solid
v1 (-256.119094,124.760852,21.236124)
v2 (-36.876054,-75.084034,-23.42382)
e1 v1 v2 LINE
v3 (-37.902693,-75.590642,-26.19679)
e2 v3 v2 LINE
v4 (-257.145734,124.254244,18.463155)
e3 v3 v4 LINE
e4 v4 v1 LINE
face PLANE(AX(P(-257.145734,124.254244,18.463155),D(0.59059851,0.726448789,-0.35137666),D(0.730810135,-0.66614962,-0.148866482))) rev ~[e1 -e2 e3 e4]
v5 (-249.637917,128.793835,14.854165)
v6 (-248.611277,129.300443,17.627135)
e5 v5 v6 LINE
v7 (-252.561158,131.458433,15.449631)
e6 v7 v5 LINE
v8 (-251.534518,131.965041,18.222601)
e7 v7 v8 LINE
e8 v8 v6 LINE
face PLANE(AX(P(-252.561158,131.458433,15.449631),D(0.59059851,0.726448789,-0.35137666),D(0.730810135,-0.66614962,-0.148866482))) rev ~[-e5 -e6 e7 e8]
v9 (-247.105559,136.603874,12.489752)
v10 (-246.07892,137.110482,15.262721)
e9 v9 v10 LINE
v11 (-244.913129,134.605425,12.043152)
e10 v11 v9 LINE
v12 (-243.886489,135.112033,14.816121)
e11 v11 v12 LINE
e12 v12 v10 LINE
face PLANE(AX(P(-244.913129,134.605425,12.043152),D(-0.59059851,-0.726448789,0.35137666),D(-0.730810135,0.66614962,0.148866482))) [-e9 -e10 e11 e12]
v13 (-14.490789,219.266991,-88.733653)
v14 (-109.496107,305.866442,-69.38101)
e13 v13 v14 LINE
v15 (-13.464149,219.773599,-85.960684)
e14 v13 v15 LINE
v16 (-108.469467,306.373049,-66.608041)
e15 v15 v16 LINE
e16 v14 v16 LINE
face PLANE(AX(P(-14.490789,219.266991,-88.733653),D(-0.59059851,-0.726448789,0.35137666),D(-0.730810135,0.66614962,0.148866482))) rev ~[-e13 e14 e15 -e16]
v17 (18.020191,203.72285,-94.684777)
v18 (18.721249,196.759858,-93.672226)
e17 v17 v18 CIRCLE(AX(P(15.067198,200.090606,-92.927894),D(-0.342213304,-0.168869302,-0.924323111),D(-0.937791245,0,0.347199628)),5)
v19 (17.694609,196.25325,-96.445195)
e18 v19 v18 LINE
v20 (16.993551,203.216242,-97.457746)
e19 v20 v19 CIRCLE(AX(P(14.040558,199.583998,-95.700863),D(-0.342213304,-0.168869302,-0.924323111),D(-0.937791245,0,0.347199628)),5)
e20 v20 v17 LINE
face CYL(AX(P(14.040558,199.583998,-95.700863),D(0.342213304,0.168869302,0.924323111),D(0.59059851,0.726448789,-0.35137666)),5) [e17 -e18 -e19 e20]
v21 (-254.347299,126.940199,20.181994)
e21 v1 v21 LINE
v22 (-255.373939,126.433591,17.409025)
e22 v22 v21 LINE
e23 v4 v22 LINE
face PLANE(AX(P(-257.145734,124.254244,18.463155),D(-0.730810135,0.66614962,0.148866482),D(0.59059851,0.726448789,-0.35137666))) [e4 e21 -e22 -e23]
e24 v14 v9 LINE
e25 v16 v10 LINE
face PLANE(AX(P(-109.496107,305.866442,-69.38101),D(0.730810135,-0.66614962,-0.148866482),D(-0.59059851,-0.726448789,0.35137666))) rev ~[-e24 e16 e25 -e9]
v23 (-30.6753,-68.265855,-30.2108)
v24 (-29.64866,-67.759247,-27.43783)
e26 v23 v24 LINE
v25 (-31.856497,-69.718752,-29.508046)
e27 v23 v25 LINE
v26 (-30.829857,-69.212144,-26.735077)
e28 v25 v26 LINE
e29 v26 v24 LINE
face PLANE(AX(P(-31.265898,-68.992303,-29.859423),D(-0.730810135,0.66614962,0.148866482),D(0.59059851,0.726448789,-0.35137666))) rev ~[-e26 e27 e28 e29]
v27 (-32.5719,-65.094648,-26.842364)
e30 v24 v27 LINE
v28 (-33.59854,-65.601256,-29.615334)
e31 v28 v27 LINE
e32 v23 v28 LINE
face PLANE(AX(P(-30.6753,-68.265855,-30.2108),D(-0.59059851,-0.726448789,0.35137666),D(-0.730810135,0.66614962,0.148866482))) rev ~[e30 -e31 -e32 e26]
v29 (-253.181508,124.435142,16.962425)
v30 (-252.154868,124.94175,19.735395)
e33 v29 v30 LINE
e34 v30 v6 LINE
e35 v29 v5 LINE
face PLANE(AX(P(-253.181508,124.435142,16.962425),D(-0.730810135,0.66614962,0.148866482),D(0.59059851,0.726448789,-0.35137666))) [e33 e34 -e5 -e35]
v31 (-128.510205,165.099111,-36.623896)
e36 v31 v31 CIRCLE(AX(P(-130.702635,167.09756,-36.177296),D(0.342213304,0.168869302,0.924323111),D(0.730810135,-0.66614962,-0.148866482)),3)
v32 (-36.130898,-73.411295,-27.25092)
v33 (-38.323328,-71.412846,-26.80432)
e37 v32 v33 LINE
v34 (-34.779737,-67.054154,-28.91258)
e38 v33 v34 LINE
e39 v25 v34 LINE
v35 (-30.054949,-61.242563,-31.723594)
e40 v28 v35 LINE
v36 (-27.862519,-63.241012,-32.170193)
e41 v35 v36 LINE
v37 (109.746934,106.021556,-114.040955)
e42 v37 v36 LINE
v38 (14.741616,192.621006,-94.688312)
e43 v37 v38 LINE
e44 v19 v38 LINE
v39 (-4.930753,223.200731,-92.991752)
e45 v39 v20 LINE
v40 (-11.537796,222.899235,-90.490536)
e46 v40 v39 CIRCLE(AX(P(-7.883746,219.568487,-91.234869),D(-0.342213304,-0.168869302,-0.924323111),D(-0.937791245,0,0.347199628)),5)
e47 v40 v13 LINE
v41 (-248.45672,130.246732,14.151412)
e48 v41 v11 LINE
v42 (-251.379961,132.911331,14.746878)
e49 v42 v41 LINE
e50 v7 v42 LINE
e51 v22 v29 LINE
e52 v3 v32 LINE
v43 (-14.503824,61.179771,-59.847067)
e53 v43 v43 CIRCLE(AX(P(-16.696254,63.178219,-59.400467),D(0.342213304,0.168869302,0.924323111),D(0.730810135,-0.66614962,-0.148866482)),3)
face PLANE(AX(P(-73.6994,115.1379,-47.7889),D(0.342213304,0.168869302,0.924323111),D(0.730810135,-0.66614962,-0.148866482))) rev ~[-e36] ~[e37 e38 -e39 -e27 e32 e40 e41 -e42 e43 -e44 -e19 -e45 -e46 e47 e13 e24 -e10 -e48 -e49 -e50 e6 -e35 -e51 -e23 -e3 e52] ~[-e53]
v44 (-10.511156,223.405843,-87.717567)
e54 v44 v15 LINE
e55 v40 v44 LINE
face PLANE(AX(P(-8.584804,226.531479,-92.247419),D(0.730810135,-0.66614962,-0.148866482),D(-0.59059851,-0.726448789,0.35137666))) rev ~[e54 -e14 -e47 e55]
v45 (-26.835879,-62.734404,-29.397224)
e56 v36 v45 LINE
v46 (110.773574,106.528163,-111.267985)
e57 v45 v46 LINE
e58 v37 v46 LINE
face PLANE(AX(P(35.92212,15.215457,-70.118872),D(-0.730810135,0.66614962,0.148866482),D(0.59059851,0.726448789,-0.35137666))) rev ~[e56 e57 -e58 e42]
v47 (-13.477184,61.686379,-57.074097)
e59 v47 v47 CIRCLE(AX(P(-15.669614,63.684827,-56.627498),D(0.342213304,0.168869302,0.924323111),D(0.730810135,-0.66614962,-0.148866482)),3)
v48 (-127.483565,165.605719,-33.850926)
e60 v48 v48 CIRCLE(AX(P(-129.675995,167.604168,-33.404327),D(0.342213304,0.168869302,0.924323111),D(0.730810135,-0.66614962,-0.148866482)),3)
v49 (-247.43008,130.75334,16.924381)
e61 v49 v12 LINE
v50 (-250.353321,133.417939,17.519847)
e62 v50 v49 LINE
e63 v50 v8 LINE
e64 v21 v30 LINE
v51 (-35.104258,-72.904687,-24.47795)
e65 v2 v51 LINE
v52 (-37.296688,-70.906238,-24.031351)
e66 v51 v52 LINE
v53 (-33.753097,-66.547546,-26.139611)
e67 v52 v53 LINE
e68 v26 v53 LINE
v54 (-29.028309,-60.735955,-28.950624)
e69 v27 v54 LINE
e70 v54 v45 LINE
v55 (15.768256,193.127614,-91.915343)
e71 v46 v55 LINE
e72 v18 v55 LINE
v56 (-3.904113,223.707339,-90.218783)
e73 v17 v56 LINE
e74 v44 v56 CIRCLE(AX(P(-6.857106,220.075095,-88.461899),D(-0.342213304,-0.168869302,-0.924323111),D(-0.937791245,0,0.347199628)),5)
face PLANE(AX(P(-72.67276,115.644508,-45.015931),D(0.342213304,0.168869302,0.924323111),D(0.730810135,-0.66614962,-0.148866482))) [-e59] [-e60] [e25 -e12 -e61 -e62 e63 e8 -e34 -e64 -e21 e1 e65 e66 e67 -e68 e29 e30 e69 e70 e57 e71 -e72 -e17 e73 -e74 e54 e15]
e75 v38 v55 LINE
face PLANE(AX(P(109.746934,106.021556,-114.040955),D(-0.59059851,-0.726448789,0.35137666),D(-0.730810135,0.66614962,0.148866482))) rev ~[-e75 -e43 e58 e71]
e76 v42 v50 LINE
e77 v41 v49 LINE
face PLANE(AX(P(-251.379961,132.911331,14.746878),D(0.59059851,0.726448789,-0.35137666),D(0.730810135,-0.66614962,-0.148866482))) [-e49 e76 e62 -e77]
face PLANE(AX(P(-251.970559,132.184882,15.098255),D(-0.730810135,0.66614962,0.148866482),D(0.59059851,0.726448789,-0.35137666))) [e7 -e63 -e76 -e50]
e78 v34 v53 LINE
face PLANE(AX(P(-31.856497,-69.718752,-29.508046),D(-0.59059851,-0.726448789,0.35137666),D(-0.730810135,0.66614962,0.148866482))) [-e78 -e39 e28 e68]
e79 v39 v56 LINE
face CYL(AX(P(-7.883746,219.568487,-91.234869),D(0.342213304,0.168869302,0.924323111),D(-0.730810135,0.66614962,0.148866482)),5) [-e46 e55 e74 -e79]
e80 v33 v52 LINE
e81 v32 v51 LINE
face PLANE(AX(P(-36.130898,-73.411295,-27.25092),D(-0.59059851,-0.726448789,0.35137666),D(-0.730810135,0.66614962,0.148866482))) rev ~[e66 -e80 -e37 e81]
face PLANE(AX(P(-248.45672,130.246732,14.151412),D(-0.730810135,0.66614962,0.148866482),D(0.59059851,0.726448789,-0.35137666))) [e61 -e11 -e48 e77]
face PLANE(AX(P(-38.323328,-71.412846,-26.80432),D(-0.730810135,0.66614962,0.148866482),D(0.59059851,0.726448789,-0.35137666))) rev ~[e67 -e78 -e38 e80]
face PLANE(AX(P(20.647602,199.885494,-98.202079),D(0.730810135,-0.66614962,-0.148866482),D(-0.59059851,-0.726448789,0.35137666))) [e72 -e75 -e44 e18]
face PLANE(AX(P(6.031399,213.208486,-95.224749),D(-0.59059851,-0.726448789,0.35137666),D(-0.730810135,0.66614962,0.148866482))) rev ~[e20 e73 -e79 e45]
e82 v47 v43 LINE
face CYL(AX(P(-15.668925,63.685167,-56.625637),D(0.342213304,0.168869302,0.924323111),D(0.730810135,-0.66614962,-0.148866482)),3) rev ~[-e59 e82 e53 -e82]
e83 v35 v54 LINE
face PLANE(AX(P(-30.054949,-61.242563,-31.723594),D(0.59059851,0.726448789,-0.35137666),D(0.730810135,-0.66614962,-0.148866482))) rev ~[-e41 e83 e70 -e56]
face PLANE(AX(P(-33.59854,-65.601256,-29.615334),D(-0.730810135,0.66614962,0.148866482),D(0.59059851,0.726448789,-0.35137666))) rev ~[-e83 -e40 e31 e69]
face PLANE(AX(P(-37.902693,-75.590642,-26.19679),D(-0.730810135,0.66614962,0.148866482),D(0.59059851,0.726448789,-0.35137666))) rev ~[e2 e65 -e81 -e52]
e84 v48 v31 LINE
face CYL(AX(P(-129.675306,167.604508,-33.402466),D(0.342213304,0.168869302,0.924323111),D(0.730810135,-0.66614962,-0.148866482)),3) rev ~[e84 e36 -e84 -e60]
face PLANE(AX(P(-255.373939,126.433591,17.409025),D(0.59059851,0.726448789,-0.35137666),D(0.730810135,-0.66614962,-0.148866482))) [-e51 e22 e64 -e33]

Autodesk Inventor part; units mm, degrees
ref_plane "YZ Plane" through (0, 0, 0) normal (1, 0, 0) x (0, 1, 0)
ref_plane "XZ Plane" through (0, 0, 0) normal (0, 1, 0) x (-1, 0, 0)
ref_plane "XY Plane" through (0, 0, 0) normal (0, 0, 1) x (1, 0, 0)
ref_plane "Plano de trabalho1" through (-73.6994, 115.1379, -47.7889) normal (0.3422133, 0.1688693, 0.9243231) x (0.7308101, -0.6661496, -0.1488665)
sketch "Esboço3" plane through (-73.6994, 115.1379, -47.7889) normal (0.3422133, 0.1688693, 0.9243231) x (0.7308101, -0.6661496, -0.1488665)
  line L0 (0, 0) -> (150, 0)
  line L1 (150, 0) -> (150, 125)
  line L2 (-150, -125) -> (150, -125)
  line L3 (150, -125) -> (147, -125)
  line L4 (150, -125) -> (150, -122)
  line L5 (150, -122) -> (147, -122)
  line L6 (147, -108) -> (150, -108)
  line L7 (150, -125) -> (150, -122)
  line L8 (150, -108) -> (150, 125)
  line L9 (-150, -125) -> (-150, -122)
  line L10 (-150, -122) -> (-147, -122)
  line L11 (-147, -108) -> (-150, -108)
  line L12 (-150, 125) -> (-150, -108)
  line L13 (-150, -122) -> (-150, -125)
  line L14 (0, 135) -> (20, 135)
  line L15 (0, 135) -> (-20, 135)
  line L16 (-20, 135) -> (-20, 125)
  line L17 (20, 135) -> (20, 125)
  line L18 (150, 125) -> (20, 125)
  line L19 (-20, 125) -> (-150, 125)
  line L20 (-151, -115) -> (-151, -114)
  line L21 (-151, -114) -> (-147, -114)
  line L22 (-151, -115) -> (-151, -116)
  line L23 (-151, -116) -> (-147, -116)
  line L24 (-147, -122) -> (-147, -116)
  line L25 (-147, -114) -> (-147, -108)
  line L26 (151, -115) -> (151, -114)
  line L27 (151, -114) -> (147, -114)
  line L28 (151, -115) -> (151, -116)
  line L29 (151, -116) -> (147, -116)
  line L30 (147, -122) -> (147, -116)
  line L31 (147, -114) -> (147, -108)
  point P0 (123.4452, -56.9069)
  dimension "d24" = 150
  dimension "d25" = 125
  dimension "d26" = 300
  dimension "d27" = 250
  dimension "d33" = 3
  dimension "d34" = 3
  dimension "d37" = 20
  dimension "d43" = 1
  dimension "d44" = 1
extrude "Extrusão3" add sketch "Esboço3" along normal blind 3
fillet "Arredondamento1" radius 5 2 edges at (21.1609, 200.1388, -96.8156) (-8.0715, 226.7848, -90.8609)
sketch "Esboço4" plane through (-72.6728, 115.6445, -45.0159) normal (0.3422133, 0.1688693, 0.9243231) x (0.7308101, -0.6661496, -0.1488665)
  line L0 (150, 125) -> (20, 125) projected
  line L1 (-20, 125) -> (-150, 125) projected
  line L2 (20, 125) -> (-20, 125)
  line L3 (0, 125) -> (0, -125)
  line L4 (-150, -125) -> (150, -125) projected
  line L5 (0, 0) -> (75, 0)
  line L6 (0, 0) -> (-75, 0)
  line L7 (-75, 0) -> (-78, 0)
  line L8 (75, 0) -> (78, 0)
  circle A0 centre (78, 0) radius 3
  circle A1 centre (-78, 0) radius 3
  dimension "d48" = 75
  dimension "d49" = 75
  dimension "d50" = 3
  dimension "d51" = 3
extrude "Extrusão4" cut sketch "Esboço4" against normal blind 3
properties part number "tampa"
